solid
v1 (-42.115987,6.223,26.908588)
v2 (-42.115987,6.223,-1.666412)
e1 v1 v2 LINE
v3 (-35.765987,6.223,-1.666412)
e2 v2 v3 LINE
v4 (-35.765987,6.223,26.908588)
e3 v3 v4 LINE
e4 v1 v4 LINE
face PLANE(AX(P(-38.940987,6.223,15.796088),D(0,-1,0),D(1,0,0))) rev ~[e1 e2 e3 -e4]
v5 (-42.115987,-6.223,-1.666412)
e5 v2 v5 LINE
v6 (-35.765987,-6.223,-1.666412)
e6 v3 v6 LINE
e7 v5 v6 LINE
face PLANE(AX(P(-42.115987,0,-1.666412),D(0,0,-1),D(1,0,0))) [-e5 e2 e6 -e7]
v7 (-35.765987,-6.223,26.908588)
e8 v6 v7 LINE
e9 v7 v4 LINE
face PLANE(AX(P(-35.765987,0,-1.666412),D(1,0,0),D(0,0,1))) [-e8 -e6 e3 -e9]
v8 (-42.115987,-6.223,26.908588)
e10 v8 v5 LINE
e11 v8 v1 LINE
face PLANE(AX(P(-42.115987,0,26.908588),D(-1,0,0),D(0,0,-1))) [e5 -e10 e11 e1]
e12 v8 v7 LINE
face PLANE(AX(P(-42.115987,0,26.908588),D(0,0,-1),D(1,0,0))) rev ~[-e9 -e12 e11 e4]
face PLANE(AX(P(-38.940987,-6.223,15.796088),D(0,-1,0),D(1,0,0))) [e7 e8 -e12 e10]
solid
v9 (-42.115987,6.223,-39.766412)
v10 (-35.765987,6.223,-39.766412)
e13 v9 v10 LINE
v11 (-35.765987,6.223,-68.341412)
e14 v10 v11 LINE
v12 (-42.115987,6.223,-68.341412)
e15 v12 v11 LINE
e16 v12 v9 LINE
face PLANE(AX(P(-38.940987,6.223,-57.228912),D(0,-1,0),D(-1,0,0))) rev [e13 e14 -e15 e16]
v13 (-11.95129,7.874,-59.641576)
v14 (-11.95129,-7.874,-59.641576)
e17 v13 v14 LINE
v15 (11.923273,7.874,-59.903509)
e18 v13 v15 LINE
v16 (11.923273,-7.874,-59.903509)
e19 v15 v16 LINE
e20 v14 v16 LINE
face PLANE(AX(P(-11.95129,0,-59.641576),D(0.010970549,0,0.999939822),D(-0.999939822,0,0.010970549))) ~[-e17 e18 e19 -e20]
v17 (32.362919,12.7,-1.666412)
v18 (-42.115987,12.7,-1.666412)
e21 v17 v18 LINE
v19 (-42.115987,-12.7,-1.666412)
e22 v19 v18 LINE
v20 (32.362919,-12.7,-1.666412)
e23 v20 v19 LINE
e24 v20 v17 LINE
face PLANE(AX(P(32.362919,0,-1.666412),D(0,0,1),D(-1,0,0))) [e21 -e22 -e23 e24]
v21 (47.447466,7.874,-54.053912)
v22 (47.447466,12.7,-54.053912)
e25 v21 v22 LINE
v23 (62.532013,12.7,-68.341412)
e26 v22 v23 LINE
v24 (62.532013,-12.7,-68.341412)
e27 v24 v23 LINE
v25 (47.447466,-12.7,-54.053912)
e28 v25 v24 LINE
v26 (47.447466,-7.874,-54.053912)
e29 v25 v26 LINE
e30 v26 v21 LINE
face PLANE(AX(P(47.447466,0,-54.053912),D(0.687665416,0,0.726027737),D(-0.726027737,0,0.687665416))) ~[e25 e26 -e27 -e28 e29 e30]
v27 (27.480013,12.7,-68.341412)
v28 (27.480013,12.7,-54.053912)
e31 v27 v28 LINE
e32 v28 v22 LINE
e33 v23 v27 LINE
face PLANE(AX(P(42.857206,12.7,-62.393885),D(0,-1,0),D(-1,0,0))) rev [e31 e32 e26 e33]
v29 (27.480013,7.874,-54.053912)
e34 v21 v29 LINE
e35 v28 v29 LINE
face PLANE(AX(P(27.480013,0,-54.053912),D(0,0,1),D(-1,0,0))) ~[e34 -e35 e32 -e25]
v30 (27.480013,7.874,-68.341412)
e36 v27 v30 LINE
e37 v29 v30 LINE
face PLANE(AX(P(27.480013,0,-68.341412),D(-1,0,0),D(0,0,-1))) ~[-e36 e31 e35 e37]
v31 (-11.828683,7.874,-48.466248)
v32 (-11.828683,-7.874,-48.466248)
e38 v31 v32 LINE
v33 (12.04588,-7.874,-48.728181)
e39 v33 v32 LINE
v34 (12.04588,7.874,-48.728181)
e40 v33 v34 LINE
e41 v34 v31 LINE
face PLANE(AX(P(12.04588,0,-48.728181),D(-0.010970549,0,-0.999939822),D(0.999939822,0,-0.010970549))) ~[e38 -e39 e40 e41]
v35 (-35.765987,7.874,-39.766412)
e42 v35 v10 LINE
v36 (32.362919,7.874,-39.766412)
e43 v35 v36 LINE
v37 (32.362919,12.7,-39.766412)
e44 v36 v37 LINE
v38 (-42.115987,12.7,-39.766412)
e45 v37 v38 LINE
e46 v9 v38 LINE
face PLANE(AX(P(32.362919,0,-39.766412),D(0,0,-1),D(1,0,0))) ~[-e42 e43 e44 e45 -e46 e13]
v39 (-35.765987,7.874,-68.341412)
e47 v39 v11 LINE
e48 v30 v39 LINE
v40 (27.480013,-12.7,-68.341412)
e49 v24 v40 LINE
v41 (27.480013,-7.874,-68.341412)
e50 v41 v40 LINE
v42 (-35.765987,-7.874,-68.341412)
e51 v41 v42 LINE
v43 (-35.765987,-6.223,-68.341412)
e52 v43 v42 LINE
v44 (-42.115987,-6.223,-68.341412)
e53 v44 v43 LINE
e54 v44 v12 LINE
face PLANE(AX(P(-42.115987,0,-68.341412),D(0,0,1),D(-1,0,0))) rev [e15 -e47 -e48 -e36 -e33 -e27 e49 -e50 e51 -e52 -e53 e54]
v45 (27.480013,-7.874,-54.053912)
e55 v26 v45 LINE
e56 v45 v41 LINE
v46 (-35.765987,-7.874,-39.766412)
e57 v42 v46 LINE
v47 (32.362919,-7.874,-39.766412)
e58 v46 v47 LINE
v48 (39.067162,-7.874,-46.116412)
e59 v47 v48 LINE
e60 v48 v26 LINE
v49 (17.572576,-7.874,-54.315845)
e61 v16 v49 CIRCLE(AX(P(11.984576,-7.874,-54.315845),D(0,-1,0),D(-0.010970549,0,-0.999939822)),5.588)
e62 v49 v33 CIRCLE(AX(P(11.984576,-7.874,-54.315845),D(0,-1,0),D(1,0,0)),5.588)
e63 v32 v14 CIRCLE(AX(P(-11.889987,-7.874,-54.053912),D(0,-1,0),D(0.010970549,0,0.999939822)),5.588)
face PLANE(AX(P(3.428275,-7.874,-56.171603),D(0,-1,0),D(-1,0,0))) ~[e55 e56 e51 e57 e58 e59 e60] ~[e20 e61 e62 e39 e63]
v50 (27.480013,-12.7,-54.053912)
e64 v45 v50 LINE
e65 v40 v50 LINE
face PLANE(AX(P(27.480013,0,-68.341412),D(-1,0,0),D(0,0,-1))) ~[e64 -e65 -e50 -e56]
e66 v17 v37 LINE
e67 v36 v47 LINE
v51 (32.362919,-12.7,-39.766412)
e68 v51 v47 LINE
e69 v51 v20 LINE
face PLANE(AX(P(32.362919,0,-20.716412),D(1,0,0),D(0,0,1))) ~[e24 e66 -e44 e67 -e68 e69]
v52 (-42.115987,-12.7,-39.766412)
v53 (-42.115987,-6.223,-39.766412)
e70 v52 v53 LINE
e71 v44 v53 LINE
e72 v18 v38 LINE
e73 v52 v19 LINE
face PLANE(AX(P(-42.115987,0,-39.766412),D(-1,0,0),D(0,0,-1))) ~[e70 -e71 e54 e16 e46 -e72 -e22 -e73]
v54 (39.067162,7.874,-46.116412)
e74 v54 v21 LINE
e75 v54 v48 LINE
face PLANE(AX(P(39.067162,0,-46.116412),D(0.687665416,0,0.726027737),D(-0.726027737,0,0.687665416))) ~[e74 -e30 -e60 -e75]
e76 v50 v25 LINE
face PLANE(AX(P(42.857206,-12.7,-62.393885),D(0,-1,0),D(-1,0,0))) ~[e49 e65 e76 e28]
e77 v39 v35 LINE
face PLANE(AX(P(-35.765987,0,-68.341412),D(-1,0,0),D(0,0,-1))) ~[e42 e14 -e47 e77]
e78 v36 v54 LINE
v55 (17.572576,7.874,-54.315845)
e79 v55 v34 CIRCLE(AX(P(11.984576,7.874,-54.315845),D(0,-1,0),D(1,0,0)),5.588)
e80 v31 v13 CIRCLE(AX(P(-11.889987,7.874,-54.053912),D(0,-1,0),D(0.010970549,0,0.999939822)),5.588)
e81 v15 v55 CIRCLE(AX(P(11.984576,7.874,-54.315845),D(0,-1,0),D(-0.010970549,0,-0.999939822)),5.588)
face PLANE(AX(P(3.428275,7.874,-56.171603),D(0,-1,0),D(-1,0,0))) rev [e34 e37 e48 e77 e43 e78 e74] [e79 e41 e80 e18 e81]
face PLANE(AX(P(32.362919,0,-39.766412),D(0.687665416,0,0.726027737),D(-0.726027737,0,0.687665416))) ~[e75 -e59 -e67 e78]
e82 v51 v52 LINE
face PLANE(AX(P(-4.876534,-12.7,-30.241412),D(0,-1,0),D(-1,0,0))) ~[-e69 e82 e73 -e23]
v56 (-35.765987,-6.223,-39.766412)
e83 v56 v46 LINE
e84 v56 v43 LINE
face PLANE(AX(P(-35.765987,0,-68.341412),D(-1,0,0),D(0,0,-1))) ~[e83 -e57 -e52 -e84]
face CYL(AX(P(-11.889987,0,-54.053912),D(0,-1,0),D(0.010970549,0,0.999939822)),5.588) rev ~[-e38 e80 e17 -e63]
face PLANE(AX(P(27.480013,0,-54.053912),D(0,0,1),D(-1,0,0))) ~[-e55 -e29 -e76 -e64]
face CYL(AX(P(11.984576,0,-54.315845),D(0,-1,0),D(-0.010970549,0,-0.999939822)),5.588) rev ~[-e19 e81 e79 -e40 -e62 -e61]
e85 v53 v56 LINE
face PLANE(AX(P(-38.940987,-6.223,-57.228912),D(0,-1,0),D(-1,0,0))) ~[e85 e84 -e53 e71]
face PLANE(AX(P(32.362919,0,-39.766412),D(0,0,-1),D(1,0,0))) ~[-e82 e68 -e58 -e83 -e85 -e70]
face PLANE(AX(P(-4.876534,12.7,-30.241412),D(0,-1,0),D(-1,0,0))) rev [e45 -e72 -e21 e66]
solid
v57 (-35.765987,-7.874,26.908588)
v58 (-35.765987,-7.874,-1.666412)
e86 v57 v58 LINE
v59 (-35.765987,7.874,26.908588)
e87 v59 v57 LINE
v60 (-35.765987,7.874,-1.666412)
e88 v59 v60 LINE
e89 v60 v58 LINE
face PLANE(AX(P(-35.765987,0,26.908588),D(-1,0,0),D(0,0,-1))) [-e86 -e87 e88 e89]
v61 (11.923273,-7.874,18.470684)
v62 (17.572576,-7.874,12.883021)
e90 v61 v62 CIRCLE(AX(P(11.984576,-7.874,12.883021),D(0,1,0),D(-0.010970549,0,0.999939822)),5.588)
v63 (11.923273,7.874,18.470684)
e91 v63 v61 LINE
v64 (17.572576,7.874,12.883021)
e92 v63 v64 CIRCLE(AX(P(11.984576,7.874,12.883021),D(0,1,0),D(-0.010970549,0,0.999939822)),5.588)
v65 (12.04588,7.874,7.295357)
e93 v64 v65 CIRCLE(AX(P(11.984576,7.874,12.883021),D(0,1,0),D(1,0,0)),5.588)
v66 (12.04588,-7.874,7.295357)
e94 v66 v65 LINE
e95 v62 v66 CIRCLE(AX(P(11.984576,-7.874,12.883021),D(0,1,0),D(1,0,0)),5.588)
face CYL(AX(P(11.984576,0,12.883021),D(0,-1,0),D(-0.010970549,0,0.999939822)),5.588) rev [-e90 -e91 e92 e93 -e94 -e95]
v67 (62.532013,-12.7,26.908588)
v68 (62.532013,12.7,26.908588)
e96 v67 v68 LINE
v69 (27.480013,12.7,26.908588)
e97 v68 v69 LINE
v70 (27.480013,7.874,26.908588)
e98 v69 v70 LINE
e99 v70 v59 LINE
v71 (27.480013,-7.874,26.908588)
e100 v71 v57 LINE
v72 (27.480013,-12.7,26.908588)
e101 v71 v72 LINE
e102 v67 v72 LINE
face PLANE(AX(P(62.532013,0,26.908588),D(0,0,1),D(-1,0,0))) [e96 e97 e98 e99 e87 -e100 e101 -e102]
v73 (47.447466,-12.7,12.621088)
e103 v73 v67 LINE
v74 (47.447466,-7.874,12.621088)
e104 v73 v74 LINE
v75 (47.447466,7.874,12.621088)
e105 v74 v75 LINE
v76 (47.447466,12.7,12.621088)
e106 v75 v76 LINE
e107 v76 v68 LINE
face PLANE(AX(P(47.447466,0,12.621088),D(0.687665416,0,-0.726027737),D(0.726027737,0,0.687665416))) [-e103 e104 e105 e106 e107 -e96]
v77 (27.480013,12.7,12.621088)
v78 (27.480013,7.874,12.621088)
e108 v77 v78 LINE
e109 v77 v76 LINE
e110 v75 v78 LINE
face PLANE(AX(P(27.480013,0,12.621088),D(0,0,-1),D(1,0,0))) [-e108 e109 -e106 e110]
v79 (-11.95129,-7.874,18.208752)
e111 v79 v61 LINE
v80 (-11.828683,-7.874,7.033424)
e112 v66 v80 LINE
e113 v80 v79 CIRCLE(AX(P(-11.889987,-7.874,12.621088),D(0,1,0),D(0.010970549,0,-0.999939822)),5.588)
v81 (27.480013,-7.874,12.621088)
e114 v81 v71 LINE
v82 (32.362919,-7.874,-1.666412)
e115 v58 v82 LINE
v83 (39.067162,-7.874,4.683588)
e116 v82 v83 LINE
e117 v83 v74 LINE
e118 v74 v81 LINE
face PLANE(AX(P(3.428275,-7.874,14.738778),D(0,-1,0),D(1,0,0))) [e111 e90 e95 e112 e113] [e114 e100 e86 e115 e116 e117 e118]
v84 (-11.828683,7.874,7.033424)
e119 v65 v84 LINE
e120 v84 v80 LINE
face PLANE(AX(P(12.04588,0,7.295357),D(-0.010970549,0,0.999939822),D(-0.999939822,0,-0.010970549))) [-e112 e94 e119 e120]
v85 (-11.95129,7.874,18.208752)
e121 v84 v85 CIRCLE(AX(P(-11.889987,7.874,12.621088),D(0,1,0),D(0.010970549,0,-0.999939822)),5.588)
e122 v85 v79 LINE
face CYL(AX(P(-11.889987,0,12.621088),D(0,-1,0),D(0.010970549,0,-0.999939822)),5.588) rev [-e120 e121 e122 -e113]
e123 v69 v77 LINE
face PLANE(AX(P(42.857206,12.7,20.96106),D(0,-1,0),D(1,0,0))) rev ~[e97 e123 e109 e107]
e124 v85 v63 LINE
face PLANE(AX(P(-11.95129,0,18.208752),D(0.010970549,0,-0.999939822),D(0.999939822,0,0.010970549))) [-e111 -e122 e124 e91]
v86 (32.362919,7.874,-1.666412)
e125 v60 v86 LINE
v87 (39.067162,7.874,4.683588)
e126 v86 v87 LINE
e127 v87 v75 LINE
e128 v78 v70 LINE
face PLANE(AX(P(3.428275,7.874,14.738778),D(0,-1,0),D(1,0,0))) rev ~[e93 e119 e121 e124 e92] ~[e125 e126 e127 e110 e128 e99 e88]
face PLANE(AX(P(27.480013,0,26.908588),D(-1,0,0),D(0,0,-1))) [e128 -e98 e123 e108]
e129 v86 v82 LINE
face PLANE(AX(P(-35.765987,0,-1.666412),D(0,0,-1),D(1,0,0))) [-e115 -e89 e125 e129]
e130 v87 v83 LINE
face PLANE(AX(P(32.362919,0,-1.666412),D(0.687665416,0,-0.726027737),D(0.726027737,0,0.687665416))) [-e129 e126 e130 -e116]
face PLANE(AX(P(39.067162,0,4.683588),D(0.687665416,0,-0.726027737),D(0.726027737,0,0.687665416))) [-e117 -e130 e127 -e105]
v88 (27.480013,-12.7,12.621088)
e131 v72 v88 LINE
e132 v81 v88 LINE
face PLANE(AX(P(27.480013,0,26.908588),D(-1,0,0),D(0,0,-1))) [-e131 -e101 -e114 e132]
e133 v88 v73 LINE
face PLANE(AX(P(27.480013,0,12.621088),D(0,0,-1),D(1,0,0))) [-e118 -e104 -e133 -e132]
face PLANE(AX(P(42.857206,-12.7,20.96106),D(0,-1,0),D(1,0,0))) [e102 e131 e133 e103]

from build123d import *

# Parameters (mm, degrees)
F1_DEPTH = 12.7
F2_DEPTH = 7.874
F0_W     = 6.35
F0_H     = 22.225
F0_H_2   = 6.35
F3_DEPTH = 6.223


with BuildPart() as f1:
    # F0 (on Front) → F1 (new body, symmetric)
    with BuildSketch(Plane.XZ):
        Polygon((62.5320133061, 26.9085878074), (27.4800133061, 26.9085878074), (27.4800133061, 12.6210878074), (47.4474663035, 12.6210878074), align=None)
    extrude(amount=F1_DEPTH, both=True)

    # F0 (on Front) → F2 (join, symmetric)
    with BuildSketch(Plane.XZ):
        Polygon((27.4800133061, 26.9085878074), (-35.7659866939, 26.9085878074), (-35.7659866939, 4.6835878074), (39.0671624131, 4.6835878074), (47.4474663035, 12.6210878074), (27.4800133061, 12.6210878074), align=None)
        with BuildLine():
            ThreePointArc((-11.8286832659, 7.0334240837), (-17.4776504176, 12.5597843794), (-11.9512901219, 18.2087515312))
            Line((-11.9512901219, 18.2087515312), (11.9232730614, 18.4706843599))
            ThreePointArc((11.9232730614, 18.4706843599), (15.9141553755, 16.8559482441), (17.5725764894, 12.8830206361))
            ThreePointArc((17.5725764894, 12.8830206361), (15.9575040974, 8.95344175), (12.0458799174, 7.2953569124))
            Line((12.0458799174, 7.2953569124), (-11.8286832659, 7.0334240837))
        make_face(mode=Mode.SUBTRACT)
        Polygon((39.0671624131, 4.6835878074), (-35.7659866939, 4.6835878074), (-35.7659866939, -1.6664121926), (32.3629193008, -1.6664121926), align=None)
    extrude(amount=F2_DEPTH, both=True)


with BuildPart() as f1b:
    # F0 (on Front) → F1, piece 2 (new body, symmetric)
    with BuildSketch(Plane.XZ):
        Polygon((-35.7659866939, -1.6664121926), (-42.1159866939, -1.6664121926), (-42.1159866939, -20.7164121926), (32.3629193008, -20.7164121926), (32.3629193008, -1.6664121926), align=None)
    extrude(amount=F1_DEPTH, both=True)



with BuildPart() as f3:
    # F0 (on Front) → F3 (new body, symmetric)
    with BuildSketch(Plane.XZ):
        with Locations((-38.9409866939, 15.7960878074)):
            Rectangle(F0_W, F0_H)
        with Locations((-38.9409866939, 1.5085878074)):
            Rectangle(F0_W, F0_H_2)
    extrude(amount=F3_DEPTH, both=True)


with BuildPart() as f1b_1:
    add(f1b.part)
    # F4: F1, F1b, F3 across face
    add(f1.part.mirror(Plane(origin=(-4.8765336965, 0, -20.7164121926), x_dir=(1, 0, 0), z_dir=(0, 0, -1))))
    add(f1b.part.mirror(Plane(origin=(-4.8765336965, 0, -20.7164121926), x_dir=(1, 0, 0), z_dir=(0, 0, -1))))
    add(f3.part.mirror(Plane(origin=(-4.8765336965, 0, -20.7164121926), x_dir=(1, 0, 0), z_dir=(0, 0, -1))))


solid = Compound([f1.part, f3.part, f1b_1.part])
